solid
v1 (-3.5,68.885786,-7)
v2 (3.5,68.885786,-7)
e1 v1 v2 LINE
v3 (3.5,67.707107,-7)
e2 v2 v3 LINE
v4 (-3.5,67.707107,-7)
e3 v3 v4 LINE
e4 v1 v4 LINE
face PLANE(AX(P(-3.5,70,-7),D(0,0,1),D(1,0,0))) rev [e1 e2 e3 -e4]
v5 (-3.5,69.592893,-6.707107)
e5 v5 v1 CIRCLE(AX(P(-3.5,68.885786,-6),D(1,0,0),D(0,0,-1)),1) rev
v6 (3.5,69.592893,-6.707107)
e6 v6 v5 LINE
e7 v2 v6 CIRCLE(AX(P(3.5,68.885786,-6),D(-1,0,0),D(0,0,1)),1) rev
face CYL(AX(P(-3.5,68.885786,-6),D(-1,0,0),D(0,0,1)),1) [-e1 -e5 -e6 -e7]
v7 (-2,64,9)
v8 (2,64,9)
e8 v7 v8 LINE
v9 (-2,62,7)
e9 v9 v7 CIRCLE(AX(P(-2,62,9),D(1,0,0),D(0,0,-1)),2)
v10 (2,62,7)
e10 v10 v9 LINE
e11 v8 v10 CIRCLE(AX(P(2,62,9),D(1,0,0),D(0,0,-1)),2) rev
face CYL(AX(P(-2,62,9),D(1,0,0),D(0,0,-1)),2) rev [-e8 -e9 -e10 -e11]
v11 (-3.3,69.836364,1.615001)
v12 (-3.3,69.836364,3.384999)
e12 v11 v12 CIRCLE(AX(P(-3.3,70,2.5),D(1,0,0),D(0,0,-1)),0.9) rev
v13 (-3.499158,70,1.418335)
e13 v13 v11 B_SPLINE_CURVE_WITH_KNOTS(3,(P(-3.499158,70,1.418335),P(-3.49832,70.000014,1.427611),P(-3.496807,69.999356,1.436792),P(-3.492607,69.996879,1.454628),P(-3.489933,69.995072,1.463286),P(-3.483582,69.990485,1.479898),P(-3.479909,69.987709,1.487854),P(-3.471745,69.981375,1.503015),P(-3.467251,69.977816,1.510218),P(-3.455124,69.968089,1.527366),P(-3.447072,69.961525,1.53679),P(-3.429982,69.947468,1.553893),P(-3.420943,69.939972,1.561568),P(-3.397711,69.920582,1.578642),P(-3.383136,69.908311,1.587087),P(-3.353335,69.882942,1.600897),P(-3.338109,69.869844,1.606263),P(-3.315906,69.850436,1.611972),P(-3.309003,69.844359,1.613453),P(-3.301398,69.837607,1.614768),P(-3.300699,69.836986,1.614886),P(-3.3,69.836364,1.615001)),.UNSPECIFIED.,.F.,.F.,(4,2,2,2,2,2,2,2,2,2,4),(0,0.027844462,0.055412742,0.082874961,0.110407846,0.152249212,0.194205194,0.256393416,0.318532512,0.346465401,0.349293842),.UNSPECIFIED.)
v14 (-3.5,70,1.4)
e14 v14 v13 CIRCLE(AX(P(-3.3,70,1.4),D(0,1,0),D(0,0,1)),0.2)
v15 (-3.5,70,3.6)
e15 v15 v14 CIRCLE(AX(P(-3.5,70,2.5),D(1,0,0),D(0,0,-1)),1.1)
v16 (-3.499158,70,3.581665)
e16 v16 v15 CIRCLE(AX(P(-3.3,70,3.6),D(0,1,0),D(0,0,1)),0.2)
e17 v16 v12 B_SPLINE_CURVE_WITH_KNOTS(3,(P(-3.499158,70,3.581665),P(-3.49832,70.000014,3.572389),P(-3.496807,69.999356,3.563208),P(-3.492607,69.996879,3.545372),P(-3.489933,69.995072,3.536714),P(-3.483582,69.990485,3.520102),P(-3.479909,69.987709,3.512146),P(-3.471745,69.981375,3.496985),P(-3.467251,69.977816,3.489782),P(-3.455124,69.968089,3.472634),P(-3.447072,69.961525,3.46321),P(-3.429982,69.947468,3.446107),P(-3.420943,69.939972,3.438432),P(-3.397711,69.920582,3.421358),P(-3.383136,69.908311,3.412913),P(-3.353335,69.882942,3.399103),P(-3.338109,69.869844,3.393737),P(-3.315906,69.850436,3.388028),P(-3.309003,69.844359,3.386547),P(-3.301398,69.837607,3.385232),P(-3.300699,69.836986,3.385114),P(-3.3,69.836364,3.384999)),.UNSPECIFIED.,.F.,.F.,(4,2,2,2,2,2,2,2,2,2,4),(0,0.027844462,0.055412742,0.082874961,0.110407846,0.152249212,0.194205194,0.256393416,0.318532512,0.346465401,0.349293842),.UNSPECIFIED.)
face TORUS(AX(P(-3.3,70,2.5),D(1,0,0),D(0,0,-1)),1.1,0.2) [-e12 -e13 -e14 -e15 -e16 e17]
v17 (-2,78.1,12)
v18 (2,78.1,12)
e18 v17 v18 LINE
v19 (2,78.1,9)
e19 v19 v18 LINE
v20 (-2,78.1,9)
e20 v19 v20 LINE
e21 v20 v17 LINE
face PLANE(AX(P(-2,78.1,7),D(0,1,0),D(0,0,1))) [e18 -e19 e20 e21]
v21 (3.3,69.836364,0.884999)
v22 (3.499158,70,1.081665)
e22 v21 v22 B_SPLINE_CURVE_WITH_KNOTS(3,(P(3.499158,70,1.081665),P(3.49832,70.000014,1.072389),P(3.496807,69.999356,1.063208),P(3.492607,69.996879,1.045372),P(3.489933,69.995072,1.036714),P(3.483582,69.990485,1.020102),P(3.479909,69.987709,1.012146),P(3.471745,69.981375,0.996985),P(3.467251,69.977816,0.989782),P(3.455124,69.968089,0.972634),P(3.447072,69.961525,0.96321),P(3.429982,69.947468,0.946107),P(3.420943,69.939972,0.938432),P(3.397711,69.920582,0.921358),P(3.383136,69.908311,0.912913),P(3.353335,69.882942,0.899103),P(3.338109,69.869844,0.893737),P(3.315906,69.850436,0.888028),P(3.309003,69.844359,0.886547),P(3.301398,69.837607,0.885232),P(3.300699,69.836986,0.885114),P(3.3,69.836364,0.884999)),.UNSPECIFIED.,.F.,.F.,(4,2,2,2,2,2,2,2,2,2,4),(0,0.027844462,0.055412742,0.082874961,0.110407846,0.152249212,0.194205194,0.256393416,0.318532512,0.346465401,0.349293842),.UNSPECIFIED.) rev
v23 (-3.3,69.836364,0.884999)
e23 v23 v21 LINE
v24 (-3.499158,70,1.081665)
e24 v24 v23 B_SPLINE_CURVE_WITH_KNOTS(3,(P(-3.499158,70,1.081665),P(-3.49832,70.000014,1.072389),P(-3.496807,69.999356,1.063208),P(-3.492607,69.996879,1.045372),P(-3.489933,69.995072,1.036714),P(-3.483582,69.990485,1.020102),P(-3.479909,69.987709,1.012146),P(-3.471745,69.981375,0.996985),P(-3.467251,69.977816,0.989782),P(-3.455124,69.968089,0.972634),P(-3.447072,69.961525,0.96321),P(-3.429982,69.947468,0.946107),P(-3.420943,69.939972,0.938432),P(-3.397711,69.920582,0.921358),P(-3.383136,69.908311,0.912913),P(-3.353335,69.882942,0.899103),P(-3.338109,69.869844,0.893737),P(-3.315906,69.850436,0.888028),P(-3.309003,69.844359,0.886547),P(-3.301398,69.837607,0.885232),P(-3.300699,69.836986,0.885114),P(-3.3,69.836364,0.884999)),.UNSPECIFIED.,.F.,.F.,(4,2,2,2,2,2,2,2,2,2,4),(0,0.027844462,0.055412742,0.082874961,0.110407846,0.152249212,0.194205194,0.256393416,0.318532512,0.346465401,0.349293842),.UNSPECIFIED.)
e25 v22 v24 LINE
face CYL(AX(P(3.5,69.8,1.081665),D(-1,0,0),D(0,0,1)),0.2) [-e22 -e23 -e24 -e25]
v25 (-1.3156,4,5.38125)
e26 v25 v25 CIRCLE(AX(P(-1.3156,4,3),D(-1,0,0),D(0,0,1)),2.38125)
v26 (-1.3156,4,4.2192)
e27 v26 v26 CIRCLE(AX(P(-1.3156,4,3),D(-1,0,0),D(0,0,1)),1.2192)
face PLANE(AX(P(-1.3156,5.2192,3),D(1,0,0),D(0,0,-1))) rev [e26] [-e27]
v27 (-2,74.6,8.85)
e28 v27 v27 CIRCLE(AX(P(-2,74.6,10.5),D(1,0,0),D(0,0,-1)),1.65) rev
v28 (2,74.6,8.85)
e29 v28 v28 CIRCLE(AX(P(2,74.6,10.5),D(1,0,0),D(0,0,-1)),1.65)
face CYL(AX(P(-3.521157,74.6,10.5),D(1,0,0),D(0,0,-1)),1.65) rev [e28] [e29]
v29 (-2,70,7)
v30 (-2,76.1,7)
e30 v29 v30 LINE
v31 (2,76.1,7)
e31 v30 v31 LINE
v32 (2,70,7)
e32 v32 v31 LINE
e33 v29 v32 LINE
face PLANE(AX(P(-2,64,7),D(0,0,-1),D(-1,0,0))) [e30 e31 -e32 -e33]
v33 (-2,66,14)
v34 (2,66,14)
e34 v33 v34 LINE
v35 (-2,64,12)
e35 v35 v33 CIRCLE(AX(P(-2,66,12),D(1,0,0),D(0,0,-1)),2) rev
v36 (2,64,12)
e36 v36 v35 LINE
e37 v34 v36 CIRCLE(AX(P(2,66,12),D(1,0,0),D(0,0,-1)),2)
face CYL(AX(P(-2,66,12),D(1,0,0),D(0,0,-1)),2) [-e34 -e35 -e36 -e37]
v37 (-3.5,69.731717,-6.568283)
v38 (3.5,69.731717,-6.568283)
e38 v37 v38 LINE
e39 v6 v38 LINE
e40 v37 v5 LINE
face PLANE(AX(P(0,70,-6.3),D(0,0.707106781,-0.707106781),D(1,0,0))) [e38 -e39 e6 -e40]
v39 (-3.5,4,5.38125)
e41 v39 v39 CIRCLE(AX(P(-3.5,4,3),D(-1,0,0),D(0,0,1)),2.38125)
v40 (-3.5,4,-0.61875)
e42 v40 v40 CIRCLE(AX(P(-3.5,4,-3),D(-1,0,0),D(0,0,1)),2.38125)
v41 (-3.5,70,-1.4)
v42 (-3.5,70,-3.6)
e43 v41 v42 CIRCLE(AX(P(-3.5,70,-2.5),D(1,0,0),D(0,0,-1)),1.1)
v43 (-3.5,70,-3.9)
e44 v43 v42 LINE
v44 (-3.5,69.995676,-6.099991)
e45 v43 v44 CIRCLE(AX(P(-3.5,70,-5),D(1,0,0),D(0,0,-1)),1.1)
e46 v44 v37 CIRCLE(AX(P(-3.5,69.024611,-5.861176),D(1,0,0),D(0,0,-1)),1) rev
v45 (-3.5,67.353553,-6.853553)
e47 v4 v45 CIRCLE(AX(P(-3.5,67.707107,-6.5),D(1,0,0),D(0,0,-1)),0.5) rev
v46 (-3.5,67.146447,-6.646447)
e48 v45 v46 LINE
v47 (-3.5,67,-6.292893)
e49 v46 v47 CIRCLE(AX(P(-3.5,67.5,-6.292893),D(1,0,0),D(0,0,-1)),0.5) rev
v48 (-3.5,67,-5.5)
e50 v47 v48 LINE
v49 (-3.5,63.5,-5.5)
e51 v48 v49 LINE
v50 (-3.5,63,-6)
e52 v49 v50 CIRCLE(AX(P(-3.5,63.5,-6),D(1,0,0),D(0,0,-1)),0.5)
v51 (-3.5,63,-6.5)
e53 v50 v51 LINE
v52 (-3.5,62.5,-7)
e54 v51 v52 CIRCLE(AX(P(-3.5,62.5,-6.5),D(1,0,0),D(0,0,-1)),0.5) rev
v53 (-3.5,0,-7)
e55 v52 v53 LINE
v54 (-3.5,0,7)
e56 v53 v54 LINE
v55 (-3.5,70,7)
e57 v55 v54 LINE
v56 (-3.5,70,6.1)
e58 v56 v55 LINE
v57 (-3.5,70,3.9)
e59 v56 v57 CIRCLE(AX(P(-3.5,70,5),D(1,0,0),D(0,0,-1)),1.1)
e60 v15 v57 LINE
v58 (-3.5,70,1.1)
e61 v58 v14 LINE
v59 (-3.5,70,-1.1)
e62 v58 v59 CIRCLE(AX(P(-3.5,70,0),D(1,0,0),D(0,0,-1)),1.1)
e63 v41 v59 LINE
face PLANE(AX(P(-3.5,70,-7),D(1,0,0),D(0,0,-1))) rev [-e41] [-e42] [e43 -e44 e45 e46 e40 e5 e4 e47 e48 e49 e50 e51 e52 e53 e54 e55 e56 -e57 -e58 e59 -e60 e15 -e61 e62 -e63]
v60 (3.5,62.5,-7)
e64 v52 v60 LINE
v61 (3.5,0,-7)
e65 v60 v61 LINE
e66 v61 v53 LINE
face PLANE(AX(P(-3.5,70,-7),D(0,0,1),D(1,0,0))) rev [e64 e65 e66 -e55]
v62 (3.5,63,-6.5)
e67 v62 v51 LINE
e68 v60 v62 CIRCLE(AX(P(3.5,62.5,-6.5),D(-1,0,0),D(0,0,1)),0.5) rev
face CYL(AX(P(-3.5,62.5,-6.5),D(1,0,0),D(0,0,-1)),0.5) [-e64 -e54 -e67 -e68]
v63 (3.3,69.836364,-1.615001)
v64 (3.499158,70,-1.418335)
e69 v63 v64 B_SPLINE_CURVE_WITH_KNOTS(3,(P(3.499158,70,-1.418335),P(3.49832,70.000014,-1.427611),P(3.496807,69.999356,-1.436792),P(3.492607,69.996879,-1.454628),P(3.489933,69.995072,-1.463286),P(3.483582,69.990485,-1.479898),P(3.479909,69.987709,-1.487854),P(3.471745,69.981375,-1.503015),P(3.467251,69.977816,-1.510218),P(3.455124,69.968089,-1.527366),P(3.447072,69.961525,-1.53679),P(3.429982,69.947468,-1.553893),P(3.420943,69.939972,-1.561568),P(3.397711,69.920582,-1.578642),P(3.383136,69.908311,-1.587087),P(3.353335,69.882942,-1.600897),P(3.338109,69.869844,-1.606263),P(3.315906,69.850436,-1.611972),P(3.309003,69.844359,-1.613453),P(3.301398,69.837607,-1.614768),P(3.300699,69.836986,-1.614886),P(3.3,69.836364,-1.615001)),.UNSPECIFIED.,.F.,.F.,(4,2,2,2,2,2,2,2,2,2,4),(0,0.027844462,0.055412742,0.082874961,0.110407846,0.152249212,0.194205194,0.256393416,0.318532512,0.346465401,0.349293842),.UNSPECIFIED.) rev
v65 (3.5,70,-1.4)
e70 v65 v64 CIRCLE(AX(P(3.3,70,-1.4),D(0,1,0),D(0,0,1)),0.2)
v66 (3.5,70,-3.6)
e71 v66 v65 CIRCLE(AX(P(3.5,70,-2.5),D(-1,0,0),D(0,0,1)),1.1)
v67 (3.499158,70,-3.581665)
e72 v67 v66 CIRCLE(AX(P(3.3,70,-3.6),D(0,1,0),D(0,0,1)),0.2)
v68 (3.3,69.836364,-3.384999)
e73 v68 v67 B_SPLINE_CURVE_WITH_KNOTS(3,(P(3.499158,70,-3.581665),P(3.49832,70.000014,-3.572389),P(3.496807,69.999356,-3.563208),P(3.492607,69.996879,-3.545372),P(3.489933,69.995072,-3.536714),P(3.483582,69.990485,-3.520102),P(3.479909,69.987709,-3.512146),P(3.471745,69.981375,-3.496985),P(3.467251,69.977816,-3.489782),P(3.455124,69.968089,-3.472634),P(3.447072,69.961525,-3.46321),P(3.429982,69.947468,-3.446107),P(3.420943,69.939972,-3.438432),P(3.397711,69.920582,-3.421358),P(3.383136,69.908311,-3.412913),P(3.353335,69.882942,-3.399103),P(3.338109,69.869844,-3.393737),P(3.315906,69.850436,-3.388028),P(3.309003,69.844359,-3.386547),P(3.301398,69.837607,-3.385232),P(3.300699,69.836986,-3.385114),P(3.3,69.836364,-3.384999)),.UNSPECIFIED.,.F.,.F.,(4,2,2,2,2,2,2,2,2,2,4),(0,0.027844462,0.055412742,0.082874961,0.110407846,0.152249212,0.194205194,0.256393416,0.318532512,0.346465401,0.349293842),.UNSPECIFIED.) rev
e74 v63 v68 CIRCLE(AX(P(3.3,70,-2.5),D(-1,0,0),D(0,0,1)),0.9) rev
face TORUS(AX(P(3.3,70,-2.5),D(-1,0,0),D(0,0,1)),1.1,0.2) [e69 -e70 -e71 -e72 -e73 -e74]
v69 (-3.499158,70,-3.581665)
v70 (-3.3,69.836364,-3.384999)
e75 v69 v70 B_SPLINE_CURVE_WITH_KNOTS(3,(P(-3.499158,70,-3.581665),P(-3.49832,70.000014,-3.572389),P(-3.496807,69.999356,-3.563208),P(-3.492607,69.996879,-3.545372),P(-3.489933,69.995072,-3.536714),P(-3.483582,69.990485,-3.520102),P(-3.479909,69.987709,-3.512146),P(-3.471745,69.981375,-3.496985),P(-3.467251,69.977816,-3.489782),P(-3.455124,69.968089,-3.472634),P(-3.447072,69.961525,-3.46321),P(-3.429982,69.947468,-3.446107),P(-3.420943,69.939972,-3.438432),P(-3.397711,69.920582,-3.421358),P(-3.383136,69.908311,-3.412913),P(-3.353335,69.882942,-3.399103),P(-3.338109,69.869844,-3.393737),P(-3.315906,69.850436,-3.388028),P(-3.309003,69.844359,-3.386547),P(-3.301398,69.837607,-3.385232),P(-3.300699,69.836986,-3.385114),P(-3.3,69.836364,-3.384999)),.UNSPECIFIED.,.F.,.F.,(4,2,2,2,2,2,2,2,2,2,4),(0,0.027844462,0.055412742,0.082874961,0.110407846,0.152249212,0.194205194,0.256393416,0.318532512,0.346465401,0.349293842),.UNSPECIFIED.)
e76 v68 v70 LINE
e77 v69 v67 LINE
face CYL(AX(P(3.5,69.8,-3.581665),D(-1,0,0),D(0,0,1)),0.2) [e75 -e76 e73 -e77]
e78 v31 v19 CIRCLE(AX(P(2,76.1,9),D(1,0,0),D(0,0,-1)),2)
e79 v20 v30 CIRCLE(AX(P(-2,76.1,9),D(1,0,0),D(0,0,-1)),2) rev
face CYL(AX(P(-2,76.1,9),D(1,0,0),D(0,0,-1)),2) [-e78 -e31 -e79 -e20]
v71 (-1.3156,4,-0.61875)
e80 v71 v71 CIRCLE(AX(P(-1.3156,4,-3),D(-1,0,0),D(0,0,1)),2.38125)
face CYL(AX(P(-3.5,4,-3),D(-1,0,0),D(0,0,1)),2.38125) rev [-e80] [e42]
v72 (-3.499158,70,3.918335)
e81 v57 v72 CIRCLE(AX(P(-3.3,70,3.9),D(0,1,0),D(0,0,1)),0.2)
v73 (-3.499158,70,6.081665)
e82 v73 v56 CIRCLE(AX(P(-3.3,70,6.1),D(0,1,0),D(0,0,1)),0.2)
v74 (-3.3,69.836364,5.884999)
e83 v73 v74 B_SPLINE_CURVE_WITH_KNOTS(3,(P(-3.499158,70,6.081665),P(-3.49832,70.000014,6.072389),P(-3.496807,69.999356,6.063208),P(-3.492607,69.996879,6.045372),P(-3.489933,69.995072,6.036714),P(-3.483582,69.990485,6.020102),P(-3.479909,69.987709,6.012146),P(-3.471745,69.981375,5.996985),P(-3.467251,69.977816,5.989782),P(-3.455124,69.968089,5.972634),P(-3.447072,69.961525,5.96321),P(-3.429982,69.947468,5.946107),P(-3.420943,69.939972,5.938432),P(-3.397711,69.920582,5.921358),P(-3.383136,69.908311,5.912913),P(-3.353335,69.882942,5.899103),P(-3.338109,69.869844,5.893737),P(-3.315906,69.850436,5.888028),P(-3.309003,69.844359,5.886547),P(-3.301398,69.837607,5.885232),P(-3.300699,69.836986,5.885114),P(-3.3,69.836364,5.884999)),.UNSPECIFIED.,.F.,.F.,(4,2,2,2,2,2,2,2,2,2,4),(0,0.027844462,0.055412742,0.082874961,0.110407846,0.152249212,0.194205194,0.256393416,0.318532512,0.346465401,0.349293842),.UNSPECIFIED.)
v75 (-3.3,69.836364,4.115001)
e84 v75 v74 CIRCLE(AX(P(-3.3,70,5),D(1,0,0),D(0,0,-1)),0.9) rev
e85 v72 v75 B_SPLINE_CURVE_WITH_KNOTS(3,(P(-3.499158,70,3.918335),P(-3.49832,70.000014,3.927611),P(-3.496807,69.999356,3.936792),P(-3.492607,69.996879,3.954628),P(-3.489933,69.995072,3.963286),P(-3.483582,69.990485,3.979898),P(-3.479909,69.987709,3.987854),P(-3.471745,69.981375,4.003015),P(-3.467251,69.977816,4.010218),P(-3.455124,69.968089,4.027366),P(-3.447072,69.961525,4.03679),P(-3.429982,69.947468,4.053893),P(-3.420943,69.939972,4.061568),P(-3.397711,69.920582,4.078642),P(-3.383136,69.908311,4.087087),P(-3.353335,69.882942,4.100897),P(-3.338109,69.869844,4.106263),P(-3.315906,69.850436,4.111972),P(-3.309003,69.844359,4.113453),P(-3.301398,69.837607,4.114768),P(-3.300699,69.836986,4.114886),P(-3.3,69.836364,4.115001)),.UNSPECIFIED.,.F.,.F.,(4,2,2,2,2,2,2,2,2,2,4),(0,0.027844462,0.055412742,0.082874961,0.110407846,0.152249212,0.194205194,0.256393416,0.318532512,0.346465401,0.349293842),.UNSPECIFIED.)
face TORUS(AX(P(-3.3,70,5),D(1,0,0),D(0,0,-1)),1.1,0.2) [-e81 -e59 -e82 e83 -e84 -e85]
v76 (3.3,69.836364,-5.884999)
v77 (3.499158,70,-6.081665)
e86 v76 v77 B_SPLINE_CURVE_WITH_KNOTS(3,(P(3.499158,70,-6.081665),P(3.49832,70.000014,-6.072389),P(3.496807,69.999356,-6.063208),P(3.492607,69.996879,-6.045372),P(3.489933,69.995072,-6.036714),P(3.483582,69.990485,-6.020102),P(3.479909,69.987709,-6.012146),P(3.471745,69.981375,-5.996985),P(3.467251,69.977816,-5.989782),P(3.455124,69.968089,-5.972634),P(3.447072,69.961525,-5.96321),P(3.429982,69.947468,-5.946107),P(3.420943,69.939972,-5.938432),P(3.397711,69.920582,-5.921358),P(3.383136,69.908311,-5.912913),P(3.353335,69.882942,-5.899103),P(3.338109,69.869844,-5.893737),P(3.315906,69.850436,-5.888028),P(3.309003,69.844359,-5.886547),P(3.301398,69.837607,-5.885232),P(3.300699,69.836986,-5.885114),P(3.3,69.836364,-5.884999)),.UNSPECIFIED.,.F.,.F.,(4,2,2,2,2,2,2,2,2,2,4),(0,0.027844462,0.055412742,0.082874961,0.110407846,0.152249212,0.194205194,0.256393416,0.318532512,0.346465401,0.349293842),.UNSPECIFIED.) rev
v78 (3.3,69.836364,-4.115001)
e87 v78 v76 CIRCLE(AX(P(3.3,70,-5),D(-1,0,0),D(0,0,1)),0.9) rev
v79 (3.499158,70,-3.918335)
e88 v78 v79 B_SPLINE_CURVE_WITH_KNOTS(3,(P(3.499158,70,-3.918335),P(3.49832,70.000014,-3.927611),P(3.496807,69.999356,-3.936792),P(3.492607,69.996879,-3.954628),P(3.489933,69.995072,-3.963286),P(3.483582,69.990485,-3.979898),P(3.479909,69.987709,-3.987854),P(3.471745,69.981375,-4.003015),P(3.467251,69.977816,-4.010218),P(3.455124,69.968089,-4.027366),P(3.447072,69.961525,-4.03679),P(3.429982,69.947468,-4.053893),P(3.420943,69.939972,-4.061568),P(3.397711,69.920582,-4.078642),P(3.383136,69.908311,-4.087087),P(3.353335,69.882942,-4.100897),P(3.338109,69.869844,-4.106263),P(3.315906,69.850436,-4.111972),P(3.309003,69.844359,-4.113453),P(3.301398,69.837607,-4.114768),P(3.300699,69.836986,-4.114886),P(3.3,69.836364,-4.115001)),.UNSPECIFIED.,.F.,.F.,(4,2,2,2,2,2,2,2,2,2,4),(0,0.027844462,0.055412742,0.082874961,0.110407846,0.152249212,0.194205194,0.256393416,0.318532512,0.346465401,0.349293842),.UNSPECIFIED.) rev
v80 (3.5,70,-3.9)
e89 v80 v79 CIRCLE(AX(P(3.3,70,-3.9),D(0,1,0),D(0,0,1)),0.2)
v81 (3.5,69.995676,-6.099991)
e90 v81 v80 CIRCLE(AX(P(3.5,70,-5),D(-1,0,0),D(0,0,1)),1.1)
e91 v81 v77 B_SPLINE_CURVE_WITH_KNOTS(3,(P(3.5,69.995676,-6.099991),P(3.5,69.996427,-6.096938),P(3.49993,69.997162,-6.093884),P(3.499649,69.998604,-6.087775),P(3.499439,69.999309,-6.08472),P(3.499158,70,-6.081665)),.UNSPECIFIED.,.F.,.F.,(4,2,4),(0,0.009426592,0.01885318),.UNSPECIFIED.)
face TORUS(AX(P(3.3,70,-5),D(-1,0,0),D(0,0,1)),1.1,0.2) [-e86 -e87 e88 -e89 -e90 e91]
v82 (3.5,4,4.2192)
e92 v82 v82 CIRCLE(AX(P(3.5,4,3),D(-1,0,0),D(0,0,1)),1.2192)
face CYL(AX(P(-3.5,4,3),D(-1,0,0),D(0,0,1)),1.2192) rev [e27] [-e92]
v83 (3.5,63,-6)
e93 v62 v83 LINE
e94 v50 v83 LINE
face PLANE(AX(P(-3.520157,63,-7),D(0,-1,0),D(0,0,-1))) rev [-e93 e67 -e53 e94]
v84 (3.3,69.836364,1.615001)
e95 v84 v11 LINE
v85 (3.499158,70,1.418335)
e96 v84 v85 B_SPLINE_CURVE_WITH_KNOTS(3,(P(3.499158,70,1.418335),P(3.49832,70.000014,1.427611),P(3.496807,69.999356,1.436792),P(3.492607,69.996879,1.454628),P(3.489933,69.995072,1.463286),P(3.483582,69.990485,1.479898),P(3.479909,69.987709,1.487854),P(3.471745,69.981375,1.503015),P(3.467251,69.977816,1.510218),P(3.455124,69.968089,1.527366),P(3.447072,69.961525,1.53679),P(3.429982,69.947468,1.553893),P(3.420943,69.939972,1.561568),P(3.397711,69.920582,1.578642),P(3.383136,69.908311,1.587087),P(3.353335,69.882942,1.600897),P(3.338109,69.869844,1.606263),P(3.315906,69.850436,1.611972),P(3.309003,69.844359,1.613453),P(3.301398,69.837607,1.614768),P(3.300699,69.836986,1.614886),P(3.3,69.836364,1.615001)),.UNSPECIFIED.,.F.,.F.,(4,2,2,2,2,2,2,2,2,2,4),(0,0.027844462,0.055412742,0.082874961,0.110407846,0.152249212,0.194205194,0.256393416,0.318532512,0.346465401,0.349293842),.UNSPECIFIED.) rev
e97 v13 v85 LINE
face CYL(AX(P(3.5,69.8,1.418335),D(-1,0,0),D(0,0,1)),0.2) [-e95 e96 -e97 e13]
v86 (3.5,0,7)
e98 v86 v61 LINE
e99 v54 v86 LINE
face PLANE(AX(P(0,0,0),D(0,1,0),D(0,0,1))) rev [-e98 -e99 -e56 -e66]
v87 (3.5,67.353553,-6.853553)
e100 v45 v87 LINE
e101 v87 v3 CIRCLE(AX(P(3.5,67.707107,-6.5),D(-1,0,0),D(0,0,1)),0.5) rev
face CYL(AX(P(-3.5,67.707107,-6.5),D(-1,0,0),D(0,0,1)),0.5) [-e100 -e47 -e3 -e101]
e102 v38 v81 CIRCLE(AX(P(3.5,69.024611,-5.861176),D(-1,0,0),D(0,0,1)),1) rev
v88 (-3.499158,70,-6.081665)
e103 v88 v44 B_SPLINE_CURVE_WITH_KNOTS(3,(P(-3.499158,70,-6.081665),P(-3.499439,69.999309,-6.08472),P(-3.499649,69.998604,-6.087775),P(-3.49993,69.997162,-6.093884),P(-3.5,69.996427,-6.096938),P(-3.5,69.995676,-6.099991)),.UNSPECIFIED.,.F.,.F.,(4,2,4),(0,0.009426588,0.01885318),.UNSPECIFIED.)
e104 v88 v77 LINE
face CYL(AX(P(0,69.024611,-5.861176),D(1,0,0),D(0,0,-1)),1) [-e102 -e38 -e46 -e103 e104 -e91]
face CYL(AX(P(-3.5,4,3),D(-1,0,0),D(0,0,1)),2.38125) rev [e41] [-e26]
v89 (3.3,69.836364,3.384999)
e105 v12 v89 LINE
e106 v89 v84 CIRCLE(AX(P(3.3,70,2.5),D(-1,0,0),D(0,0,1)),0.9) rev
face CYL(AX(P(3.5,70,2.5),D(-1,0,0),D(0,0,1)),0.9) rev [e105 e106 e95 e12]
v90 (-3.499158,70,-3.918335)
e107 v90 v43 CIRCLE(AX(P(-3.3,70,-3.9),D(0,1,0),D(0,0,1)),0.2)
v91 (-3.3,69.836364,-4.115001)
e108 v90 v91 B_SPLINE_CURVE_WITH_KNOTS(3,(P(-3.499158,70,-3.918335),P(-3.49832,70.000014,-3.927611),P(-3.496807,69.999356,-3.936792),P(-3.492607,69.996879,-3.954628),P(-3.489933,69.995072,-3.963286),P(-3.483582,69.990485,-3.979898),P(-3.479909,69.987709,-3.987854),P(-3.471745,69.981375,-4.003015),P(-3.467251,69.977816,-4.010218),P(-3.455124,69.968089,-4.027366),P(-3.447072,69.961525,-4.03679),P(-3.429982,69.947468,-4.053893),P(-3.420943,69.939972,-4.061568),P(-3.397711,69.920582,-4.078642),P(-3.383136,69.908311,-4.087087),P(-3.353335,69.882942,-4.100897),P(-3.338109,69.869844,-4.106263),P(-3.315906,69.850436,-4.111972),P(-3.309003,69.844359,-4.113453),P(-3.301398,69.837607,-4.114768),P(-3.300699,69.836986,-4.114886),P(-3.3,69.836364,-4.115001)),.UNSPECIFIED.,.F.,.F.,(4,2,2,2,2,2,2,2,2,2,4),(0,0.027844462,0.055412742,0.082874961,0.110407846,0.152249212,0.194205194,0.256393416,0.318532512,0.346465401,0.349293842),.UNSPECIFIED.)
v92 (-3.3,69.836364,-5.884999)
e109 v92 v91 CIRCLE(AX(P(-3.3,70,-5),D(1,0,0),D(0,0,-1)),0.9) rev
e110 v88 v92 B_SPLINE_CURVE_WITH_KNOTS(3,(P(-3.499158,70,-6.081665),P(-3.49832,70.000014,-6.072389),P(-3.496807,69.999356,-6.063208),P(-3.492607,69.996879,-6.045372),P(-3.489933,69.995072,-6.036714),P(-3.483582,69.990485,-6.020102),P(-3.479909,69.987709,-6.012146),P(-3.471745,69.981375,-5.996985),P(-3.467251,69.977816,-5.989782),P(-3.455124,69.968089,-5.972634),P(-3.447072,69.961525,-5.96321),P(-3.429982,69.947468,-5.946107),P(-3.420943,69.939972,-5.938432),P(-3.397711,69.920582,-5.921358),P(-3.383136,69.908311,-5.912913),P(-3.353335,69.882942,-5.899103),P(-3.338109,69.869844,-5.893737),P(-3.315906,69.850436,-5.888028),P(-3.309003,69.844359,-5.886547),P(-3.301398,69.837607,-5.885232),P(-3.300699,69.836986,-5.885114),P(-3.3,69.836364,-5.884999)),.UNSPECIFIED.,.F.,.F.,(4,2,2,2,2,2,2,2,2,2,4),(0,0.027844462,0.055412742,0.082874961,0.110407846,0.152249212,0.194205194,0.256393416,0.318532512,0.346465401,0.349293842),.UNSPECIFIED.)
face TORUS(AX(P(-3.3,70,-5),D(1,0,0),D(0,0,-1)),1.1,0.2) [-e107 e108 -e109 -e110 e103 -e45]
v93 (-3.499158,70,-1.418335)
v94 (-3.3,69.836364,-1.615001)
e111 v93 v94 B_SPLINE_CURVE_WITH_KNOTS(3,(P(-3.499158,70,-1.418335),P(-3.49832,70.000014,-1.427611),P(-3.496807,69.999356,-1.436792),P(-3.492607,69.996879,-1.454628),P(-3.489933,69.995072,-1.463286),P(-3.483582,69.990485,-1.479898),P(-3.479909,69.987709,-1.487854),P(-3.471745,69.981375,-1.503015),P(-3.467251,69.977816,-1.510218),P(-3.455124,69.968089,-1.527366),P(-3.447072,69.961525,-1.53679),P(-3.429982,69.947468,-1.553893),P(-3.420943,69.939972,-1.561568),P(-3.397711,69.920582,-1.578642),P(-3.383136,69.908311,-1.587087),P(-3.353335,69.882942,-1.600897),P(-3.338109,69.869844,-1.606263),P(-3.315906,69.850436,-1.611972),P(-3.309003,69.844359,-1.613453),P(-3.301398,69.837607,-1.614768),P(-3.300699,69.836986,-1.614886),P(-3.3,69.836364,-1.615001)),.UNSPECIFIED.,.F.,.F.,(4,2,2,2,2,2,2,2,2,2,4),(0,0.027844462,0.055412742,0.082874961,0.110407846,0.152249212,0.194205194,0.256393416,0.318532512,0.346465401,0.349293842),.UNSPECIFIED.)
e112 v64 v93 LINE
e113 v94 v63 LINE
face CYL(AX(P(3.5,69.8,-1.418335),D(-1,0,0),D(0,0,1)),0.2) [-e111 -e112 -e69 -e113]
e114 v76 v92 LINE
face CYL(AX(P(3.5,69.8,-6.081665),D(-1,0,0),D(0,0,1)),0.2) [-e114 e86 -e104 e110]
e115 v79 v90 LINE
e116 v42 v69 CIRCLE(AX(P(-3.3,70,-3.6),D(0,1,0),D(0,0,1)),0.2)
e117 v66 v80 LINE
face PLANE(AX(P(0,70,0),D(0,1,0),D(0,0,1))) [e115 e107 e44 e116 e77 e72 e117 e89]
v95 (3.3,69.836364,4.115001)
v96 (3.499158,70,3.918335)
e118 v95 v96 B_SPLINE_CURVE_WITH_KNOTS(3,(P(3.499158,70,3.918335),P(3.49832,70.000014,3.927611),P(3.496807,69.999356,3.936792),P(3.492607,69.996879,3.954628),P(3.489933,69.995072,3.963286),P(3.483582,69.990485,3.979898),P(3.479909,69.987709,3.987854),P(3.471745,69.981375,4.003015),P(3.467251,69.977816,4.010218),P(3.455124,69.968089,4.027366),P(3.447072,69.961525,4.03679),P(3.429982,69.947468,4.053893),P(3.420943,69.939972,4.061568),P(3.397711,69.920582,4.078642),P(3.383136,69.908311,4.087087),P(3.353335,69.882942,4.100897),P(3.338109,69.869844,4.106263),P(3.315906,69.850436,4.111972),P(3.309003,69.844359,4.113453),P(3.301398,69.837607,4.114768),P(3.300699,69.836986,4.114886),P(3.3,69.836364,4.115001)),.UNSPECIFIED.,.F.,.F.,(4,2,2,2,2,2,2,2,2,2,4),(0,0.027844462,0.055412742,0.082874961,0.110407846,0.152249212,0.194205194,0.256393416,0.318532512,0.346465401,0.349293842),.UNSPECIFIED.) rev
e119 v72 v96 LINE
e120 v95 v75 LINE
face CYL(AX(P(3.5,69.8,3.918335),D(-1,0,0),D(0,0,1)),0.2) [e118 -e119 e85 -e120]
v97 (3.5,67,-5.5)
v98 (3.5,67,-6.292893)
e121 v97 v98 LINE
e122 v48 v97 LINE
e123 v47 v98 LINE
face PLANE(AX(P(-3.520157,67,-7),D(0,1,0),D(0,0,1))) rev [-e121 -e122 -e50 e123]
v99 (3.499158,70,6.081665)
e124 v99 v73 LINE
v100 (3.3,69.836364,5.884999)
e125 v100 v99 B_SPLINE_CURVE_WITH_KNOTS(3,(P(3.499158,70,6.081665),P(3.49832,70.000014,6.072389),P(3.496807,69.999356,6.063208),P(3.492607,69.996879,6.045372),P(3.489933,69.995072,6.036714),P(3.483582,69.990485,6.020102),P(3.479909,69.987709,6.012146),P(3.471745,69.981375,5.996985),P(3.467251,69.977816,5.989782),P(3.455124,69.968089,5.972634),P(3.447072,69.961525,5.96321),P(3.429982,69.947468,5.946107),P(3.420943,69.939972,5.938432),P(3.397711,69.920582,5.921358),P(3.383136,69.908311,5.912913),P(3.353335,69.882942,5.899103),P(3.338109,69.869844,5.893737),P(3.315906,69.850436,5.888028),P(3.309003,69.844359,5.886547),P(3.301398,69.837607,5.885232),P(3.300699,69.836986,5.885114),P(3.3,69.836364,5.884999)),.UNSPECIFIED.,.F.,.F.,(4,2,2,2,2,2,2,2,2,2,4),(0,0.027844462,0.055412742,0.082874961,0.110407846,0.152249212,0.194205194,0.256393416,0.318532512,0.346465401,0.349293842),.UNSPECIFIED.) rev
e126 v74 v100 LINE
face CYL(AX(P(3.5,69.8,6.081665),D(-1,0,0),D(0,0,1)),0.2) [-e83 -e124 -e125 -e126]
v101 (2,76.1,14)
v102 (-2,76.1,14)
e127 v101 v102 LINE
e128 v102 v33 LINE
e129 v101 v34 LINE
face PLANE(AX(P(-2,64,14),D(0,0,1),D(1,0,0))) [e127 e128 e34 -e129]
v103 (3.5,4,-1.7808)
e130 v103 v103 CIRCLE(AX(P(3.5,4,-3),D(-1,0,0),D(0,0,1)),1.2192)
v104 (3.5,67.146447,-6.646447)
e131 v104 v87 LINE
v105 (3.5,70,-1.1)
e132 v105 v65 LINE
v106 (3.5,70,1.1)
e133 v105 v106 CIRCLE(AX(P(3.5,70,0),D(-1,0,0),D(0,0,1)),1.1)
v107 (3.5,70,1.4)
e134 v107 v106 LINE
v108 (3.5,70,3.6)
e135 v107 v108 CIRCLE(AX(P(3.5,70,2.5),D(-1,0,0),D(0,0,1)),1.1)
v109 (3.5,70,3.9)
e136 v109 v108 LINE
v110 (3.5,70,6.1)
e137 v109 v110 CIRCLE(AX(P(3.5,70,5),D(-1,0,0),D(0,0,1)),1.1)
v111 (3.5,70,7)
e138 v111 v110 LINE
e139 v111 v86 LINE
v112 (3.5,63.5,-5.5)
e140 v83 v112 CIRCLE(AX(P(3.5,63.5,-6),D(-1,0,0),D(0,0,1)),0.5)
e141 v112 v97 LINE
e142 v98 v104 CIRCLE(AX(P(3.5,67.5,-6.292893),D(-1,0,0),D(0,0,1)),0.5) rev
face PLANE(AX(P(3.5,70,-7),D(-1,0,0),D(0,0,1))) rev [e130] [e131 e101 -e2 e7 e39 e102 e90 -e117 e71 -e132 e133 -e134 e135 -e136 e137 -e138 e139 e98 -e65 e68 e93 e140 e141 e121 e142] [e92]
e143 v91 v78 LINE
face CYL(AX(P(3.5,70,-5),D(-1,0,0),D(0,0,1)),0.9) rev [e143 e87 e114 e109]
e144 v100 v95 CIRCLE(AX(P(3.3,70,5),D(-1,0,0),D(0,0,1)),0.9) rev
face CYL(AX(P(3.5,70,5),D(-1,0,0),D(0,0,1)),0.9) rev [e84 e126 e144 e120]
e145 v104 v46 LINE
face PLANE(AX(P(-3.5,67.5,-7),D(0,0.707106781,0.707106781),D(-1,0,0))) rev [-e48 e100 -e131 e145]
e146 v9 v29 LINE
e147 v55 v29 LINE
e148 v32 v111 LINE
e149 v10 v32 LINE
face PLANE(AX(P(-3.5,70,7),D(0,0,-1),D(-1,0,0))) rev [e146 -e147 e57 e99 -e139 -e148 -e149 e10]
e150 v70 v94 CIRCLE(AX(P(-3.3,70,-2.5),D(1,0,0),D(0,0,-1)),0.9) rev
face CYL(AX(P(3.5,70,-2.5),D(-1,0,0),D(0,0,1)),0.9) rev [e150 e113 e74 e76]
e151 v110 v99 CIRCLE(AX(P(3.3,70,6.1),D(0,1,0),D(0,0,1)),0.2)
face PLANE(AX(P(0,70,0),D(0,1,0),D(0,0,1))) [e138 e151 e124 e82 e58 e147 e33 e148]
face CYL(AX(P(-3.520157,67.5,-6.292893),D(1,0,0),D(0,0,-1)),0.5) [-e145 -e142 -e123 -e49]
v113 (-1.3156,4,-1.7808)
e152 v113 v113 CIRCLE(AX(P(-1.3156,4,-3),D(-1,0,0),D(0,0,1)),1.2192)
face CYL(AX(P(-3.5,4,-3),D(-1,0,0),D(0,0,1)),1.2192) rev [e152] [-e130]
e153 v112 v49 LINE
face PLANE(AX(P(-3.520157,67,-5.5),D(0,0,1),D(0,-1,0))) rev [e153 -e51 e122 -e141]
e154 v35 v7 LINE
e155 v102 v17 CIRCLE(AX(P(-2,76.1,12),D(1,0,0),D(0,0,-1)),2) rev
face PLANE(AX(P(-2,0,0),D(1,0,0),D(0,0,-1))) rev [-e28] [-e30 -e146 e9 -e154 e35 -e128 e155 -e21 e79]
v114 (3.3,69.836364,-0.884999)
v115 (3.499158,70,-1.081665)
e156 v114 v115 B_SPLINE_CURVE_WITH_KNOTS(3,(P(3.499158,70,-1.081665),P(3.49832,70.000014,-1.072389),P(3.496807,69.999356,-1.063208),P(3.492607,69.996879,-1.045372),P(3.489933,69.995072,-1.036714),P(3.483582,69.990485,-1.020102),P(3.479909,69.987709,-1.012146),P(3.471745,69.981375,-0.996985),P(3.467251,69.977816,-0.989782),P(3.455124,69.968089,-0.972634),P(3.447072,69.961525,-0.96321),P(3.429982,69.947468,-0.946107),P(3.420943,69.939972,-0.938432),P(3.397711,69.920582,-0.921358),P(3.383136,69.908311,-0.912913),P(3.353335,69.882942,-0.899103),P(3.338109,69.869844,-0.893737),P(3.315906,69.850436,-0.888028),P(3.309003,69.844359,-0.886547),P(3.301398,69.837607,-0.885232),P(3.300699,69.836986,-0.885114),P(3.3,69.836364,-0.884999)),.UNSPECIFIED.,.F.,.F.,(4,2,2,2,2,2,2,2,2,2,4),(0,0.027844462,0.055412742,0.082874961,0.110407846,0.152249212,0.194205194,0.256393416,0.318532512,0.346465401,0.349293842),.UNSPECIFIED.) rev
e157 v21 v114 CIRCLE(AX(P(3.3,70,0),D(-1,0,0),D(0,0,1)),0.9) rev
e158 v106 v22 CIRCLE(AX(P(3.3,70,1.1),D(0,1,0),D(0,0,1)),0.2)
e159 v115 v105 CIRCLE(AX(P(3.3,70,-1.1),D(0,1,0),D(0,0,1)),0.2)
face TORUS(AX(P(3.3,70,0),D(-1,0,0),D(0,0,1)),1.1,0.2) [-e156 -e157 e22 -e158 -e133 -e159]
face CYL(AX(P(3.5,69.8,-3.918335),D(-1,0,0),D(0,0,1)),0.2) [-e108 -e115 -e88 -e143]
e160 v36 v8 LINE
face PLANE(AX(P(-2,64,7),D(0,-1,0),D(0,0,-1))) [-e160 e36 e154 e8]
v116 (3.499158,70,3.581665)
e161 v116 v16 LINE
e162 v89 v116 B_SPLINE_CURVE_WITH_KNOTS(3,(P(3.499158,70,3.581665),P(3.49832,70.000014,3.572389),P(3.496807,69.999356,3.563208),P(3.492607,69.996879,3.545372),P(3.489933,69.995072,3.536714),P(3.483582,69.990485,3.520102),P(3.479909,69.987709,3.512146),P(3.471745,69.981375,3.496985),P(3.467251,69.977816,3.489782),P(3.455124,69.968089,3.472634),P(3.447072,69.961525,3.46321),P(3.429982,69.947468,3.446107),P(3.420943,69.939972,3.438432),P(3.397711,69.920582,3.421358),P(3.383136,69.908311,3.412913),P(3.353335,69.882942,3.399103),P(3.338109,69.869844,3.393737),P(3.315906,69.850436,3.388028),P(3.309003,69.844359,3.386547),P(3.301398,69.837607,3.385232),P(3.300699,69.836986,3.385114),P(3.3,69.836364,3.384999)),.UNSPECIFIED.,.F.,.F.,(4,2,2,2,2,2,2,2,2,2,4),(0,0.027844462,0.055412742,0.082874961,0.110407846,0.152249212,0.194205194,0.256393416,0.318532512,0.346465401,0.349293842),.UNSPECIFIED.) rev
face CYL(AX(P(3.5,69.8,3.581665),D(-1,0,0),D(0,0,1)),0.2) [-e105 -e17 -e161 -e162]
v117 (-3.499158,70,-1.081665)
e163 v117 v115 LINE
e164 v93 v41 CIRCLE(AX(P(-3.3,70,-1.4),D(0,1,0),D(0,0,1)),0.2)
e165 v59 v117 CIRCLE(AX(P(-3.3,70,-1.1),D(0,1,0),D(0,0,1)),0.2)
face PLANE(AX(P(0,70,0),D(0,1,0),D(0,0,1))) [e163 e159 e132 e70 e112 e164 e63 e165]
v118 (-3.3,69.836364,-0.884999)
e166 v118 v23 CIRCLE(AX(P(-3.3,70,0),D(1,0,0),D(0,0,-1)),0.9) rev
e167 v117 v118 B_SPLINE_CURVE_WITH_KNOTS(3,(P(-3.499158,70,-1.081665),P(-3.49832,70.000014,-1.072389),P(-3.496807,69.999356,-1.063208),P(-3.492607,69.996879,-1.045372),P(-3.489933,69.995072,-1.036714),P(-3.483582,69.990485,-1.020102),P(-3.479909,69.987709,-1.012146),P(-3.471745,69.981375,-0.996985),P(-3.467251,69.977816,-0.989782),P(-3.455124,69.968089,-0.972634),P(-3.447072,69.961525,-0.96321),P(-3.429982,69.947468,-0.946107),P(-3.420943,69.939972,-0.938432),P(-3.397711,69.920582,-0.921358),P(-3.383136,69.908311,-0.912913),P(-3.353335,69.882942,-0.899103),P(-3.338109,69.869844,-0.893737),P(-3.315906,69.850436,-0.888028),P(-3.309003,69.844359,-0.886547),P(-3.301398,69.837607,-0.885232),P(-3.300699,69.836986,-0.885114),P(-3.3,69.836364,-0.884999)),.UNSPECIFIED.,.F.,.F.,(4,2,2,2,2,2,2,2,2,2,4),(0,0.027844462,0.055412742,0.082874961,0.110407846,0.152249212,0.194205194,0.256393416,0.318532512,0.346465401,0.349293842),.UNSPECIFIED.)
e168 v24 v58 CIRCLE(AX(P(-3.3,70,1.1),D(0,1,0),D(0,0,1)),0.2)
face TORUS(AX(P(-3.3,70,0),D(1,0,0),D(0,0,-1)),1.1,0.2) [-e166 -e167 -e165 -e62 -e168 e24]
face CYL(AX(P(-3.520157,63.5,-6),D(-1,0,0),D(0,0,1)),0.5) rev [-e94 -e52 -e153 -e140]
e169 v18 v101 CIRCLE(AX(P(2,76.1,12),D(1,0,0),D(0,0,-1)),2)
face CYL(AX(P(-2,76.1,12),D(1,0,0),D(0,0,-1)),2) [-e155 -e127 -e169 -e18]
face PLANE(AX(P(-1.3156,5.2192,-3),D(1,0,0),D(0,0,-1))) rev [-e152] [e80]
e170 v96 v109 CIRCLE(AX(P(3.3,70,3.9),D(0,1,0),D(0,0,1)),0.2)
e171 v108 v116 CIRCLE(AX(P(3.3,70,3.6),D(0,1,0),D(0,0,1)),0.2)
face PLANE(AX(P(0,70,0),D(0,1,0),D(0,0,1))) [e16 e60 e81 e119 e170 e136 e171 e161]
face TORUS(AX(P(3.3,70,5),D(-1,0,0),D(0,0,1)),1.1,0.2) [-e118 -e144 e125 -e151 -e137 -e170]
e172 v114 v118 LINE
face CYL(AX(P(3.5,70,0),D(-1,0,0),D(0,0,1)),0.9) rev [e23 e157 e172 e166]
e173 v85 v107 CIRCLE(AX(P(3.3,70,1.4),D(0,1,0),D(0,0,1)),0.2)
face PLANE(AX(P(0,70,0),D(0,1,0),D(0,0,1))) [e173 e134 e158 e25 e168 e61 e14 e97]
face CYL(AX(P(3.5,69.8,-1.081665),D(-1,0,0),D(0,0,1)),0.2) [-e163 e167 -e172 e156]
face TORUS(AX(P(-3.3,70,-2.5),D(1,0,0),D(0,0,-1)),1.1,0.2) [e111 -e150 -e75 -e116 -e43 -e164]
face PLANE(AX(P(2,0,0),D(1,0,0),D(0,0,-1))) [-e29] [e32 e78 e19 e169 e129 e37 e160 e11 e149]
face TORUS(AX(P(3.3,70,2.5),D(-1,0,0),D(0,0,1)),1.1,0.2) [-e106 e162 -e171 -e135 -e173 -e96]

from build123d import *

# Parameters (mm, degrees)
SKETCH1_W                                      = 7
SKETCH1_H                                      = 14
BOSS_EXTRUDE1_DEPTH                            = 70
CBORE_FOR_2_SOCKET_HEAD_CAP_SCREW1_D           = 2.4384
CBORE_FOR_2_SOCKET_HEAD_CAP_SCREW1_CBORE_D     = 4.7625
CBORE_FOR_2_SOCKET_HEAD_CAP_SCREW1_CBORE_DEPTH = 2.1844
CUT_EXTRUDE2_DEPTH                             = 71.696534569
LPATTERN1_COUNT                                = 3
LPATTERN1_PITCH                                = 2.5
LPATTERN1_COL_COUNT                            = 3
LPATTERN1_COL_PITCH                            = 2.5
FILLET1_R                                      = 0.2
CHAMFER1_SIZE                                  = 0.7
FILLET2_R                                      = 1
CUT_EXTRUDE4_DEPTH                             = 71.436141406
CUT_EXTRUDE4_DEPTH_BACK                        = 71.436141406
SKETCH6_W                                      = 1.5
SKETCH6_H                                      = 4
CHAMFER2_SIZE                                  = 0.5
FILLET4_R                                      = 0.5
SKETCH7_W                                      = 7
SKETCH7_H                                      = 14.1
BOSS_EXTRUDE2_DEPTH                            = 2
CUT_EXTRUDE5_REACH                             = 81.535
SKETCH9_R                                      = 1.65
FILLET5_R                                      = 2


with BuildPart() as part:
    # Sketch1 → Boss-Extrude1 (new body)
    with BuildSketch(Plane(origin=(0, 0, 0), x_dir=(1, 0, 0), z_dir=(0, 1, 0))):
        Rectangle(SKETCH1_W, SKETCH1_H)
    extrude(amount=BOSS_EXTRUDE1_DEPTH)

    # CBORE for #2 Socket Head Cap Screw1 (through all)
    with Locations(Plane(origin=(-3.5, 0, 0), x_dir=(0, 0, -1), z_dir=(-1, 0, 0))):
        with Locations((-3, -4), (3, -4)):
            CounterBoreHole(CBORE_FOR_2_SOCKET_HEAD_CAP_SCREW1_D / 2, CBORE_FOR_2_SOCKET_HEAD_CAP_SCREW1_CBORE_D / 2, CBORE_FOR_2_SOCKET_HEAD_CAP_SCREW1_CBORE_DEPTH)

    # Sketch4 → Cut-Extrude2 (cut, through all)
    with BuildSketch(Plane(origin=(3.5, 0, 0), x_dir=(0, 0, -1), z_dir=(1, 0, 0))):
        with BuildLine():
            Line((0.9, 220.888750438), (0.9, 70))
            ThreePointArc((0.9, 70), (0, 69.1), (-0.9, 70))
            Line((-0.9, 70), (-0.9, 220.888750438))
            Line((-0.9, 220.888750438), (-0.9, 522.666251314))
            Line((-0.9, 522.666251314), (0.9, 522.666251314))
            Line((0.9, 522.666251314), (0.9, 220.888750438))
        make_face()
    cut_extrude2 = extrude(amount=-CUT_EXTRUDE2_DEPTH, mode=Mode.SUBTRACT)

    # LPattern1: Cut-Extrude2 ×3
    with Locations(*[(0, 0, i * LPATTERN1_PITCH) for i in range(1, LPATTERN1_COUNT)]):
        add(cut_extrude2, mode=Mode.SUBTRACT)

    # LPattern1 col: Cut-Extrude2 ×3
    with Locations(*[(0, 0, -i * LPATTERN1_COL_PITCH) for i in range(1, LPATTERN1_COL_COUNT)]):
        add(cut_extrude2, mode=Mode.SUBTRACT)

    # Fillet1
    fillet1_edges = [part.edges().sort_by_distance(p)[0] for p in [
        (0, 70, -0.9),
        (0, 70, 0.9),
        (3.5, 69.1, 0),
        (-3.5, 69.1, 0),
        (0, 70, -3.4),
        (0, 70, -1.6),
        (3.5, 69.1, -2.5),
        (-3.5, 69.1, -2.5),
        (0, 70, -5.9),
        (0, 70, -4.1),
        (3.5, 69.1, -5),
        (-3.5, 69.1, -5),
        (0, 70, 1.6),
        (0, 70, 3.4),
        (3.5, 69.1, 2.5),
        (-3.5, 69.1, 2.5),
        (0, 70, 4.1),
        (0, 70, 5.9),
        (3.5, 69.1, 5),
        (-3.5, 69.1, 5),
    ]]
    fillet(fillet1_edges, radius=FILLET1_R)

    # Chamfer1
    chamfer1_edges = [part.edges().sort_by_distance(p)[0] for p in [
        (0, 70, -7),
    ]]
    chamfer(chamfer1_edges, length=CHAMFER1_SIZE)

    # Fillet2
    # the kernel refuses this fillet: 1 mm, written as the material it takes off along each edge
    with BuildSketch(Plane(origin=(-4.535533906, 69.3, -7), x_dir=(0, 0.707106781186555, 0.70710678118654), z_dir=(1, 0, 0))) as fillet2_piece_1:
        with BuildLine():
            CenterArc((FILLET2_R * 0.414213562373, FILLET2_R), FILLET2_R, 225, 45)
            Line((-FILLET2_R * 0.292893218813, FILLET2_R * 0.292893218813), (-FILLET2_R * 0.307035354437, FILLET2_R * 0.27875108319))
            Line((-FILLET2_R * 0.307035354437, FILLET2_R * 0.27875108319), (-FILLET2_R * 0.00828427124746, -FILLET2_R * 0.02))
            Line((-FILLET2_R * 0.00828427124746, -FILLET2_R * 0.02), (FILLET2_R * 0.414213562373, -FILLET2_R * 0.02))
            Line((FILLET2_R * 0.414213562373, -FILLET2_R * 0.02), (FILLET2_R * 0.414213562373, 0))
        make_face()
    extrude(amount=9.071067812, mode=Mode.SUBTRACT)
    with BuildSketch(Plane(origin=(-4.448522012, 70, -6.3), x_dir=(0, 0, 1), z_dir=(1, 0, 0))) as fillet2_piece_2:
        with BuildLine():
            CenterArc((0.438824243, 0.97538932), FILLET2_R, 225, 32.262207343)
            Line((-0.268282539, 0.268282539), (-0.282424674, 0.254140403))
            Line((-0.282424674, 0.254140403), (-0.014142136, -0.014142136))
            Line((-0.014142136, -0.014142136), (0, -0.02))
            ThreePointArc((0, -0.02), (0.109167309, -0.02), (0.213924825, -0.019507786))
            Line((0.213924825, -0.019507786), (0.218334617, 0))
        make_face()
    extrude(amount=8.897044023, mode=Mode.SUBTRACT)

    # Sketch6 → Cut-Extrude4 (cut, two sides: drawn at the far end of the back side and taken through both)
    with BuildSketch(Plane(origin=(0, 0, 0), x_dir=(0, 0, -1), z_dir=(1, 0, 0)).offset(-CUT_EXTRUDE4_DEPTH_BACK)):
        with Locations((6.25, 65)):
            Rectangle(SKETCH6_W, SKETCH6_H)
    extrude(amount=CUT_EXTRUDE4_DEPTH + CUT_EXTRUDE4_DEPTH_BACK, mode=Mode.SUBTRACT)

    # Chamfer2
    chamfer2_edges = [part.edges().sort_by_distance(p)[0] for p in [
        (0, 67, -7),
    ]]
    chamfer(chamfer2_edges, length=CHAMFER2_SIZE)

    # Fillet4
    fillet4_edges = [part.edges().sort_by_distance(p)[0] for p in [
        (0, 63, -7),
        (0, 63, -5.5),
        (0, 67.5, -7),
        (0, 67, -6.5),
    ]]
    fillet(fillet4_edges, radius=FILLET4_R)

    # Sketch7 → Boss-Extrude2 (add, symmetric)
    with BuildSketch(Plane(origin=(0, 0, 0), x_dir=(0, 0, -1), z_dir=(1, 0, 0))):
        with Locations((-10.5, 71.05)):
            Rectangle(SKETCH7_W, SKETCH7_H)
    extrude(amount=BOSS_EXTRUDE2_DEPTH, both=True)

    # Sketch9 → Cut-Extrude5 (cut, up to next)
    with BuildSketch(Plane(origin=(2, 0, 0), x_dir=(0, 0, -1), z_dir=(1, 0, 0)), mode=Mode.PRIVATE) as cut_extrude5_sk1:
        with Locations((-10.5, 74.6)):
            Circle(SKETCH9_R)
    cut_extrude5_tool1 = extrude(cut_extrude5_sk1.sketch, amount=-CUT_EXTRUDE5_REACH, mode=Mode.PRIVATE) & part.part
    add(cut_extrude5_tool1.solids().sort_by_distance((2, 74.6, 10.5))[0], mode=Mode.SUBTRACT)

    # Fillet5
    fillet5_edges = [part.edges().sort_by_distance(p)[0] for p in [
        (0, 78.1, 7),
        (0, 64, 7),
        (0, 64, 14),
        (0, 78.1, 14),
    ]]
    fillet(fillet5_edges, radius=FILLET5_R)


solid = part.part
